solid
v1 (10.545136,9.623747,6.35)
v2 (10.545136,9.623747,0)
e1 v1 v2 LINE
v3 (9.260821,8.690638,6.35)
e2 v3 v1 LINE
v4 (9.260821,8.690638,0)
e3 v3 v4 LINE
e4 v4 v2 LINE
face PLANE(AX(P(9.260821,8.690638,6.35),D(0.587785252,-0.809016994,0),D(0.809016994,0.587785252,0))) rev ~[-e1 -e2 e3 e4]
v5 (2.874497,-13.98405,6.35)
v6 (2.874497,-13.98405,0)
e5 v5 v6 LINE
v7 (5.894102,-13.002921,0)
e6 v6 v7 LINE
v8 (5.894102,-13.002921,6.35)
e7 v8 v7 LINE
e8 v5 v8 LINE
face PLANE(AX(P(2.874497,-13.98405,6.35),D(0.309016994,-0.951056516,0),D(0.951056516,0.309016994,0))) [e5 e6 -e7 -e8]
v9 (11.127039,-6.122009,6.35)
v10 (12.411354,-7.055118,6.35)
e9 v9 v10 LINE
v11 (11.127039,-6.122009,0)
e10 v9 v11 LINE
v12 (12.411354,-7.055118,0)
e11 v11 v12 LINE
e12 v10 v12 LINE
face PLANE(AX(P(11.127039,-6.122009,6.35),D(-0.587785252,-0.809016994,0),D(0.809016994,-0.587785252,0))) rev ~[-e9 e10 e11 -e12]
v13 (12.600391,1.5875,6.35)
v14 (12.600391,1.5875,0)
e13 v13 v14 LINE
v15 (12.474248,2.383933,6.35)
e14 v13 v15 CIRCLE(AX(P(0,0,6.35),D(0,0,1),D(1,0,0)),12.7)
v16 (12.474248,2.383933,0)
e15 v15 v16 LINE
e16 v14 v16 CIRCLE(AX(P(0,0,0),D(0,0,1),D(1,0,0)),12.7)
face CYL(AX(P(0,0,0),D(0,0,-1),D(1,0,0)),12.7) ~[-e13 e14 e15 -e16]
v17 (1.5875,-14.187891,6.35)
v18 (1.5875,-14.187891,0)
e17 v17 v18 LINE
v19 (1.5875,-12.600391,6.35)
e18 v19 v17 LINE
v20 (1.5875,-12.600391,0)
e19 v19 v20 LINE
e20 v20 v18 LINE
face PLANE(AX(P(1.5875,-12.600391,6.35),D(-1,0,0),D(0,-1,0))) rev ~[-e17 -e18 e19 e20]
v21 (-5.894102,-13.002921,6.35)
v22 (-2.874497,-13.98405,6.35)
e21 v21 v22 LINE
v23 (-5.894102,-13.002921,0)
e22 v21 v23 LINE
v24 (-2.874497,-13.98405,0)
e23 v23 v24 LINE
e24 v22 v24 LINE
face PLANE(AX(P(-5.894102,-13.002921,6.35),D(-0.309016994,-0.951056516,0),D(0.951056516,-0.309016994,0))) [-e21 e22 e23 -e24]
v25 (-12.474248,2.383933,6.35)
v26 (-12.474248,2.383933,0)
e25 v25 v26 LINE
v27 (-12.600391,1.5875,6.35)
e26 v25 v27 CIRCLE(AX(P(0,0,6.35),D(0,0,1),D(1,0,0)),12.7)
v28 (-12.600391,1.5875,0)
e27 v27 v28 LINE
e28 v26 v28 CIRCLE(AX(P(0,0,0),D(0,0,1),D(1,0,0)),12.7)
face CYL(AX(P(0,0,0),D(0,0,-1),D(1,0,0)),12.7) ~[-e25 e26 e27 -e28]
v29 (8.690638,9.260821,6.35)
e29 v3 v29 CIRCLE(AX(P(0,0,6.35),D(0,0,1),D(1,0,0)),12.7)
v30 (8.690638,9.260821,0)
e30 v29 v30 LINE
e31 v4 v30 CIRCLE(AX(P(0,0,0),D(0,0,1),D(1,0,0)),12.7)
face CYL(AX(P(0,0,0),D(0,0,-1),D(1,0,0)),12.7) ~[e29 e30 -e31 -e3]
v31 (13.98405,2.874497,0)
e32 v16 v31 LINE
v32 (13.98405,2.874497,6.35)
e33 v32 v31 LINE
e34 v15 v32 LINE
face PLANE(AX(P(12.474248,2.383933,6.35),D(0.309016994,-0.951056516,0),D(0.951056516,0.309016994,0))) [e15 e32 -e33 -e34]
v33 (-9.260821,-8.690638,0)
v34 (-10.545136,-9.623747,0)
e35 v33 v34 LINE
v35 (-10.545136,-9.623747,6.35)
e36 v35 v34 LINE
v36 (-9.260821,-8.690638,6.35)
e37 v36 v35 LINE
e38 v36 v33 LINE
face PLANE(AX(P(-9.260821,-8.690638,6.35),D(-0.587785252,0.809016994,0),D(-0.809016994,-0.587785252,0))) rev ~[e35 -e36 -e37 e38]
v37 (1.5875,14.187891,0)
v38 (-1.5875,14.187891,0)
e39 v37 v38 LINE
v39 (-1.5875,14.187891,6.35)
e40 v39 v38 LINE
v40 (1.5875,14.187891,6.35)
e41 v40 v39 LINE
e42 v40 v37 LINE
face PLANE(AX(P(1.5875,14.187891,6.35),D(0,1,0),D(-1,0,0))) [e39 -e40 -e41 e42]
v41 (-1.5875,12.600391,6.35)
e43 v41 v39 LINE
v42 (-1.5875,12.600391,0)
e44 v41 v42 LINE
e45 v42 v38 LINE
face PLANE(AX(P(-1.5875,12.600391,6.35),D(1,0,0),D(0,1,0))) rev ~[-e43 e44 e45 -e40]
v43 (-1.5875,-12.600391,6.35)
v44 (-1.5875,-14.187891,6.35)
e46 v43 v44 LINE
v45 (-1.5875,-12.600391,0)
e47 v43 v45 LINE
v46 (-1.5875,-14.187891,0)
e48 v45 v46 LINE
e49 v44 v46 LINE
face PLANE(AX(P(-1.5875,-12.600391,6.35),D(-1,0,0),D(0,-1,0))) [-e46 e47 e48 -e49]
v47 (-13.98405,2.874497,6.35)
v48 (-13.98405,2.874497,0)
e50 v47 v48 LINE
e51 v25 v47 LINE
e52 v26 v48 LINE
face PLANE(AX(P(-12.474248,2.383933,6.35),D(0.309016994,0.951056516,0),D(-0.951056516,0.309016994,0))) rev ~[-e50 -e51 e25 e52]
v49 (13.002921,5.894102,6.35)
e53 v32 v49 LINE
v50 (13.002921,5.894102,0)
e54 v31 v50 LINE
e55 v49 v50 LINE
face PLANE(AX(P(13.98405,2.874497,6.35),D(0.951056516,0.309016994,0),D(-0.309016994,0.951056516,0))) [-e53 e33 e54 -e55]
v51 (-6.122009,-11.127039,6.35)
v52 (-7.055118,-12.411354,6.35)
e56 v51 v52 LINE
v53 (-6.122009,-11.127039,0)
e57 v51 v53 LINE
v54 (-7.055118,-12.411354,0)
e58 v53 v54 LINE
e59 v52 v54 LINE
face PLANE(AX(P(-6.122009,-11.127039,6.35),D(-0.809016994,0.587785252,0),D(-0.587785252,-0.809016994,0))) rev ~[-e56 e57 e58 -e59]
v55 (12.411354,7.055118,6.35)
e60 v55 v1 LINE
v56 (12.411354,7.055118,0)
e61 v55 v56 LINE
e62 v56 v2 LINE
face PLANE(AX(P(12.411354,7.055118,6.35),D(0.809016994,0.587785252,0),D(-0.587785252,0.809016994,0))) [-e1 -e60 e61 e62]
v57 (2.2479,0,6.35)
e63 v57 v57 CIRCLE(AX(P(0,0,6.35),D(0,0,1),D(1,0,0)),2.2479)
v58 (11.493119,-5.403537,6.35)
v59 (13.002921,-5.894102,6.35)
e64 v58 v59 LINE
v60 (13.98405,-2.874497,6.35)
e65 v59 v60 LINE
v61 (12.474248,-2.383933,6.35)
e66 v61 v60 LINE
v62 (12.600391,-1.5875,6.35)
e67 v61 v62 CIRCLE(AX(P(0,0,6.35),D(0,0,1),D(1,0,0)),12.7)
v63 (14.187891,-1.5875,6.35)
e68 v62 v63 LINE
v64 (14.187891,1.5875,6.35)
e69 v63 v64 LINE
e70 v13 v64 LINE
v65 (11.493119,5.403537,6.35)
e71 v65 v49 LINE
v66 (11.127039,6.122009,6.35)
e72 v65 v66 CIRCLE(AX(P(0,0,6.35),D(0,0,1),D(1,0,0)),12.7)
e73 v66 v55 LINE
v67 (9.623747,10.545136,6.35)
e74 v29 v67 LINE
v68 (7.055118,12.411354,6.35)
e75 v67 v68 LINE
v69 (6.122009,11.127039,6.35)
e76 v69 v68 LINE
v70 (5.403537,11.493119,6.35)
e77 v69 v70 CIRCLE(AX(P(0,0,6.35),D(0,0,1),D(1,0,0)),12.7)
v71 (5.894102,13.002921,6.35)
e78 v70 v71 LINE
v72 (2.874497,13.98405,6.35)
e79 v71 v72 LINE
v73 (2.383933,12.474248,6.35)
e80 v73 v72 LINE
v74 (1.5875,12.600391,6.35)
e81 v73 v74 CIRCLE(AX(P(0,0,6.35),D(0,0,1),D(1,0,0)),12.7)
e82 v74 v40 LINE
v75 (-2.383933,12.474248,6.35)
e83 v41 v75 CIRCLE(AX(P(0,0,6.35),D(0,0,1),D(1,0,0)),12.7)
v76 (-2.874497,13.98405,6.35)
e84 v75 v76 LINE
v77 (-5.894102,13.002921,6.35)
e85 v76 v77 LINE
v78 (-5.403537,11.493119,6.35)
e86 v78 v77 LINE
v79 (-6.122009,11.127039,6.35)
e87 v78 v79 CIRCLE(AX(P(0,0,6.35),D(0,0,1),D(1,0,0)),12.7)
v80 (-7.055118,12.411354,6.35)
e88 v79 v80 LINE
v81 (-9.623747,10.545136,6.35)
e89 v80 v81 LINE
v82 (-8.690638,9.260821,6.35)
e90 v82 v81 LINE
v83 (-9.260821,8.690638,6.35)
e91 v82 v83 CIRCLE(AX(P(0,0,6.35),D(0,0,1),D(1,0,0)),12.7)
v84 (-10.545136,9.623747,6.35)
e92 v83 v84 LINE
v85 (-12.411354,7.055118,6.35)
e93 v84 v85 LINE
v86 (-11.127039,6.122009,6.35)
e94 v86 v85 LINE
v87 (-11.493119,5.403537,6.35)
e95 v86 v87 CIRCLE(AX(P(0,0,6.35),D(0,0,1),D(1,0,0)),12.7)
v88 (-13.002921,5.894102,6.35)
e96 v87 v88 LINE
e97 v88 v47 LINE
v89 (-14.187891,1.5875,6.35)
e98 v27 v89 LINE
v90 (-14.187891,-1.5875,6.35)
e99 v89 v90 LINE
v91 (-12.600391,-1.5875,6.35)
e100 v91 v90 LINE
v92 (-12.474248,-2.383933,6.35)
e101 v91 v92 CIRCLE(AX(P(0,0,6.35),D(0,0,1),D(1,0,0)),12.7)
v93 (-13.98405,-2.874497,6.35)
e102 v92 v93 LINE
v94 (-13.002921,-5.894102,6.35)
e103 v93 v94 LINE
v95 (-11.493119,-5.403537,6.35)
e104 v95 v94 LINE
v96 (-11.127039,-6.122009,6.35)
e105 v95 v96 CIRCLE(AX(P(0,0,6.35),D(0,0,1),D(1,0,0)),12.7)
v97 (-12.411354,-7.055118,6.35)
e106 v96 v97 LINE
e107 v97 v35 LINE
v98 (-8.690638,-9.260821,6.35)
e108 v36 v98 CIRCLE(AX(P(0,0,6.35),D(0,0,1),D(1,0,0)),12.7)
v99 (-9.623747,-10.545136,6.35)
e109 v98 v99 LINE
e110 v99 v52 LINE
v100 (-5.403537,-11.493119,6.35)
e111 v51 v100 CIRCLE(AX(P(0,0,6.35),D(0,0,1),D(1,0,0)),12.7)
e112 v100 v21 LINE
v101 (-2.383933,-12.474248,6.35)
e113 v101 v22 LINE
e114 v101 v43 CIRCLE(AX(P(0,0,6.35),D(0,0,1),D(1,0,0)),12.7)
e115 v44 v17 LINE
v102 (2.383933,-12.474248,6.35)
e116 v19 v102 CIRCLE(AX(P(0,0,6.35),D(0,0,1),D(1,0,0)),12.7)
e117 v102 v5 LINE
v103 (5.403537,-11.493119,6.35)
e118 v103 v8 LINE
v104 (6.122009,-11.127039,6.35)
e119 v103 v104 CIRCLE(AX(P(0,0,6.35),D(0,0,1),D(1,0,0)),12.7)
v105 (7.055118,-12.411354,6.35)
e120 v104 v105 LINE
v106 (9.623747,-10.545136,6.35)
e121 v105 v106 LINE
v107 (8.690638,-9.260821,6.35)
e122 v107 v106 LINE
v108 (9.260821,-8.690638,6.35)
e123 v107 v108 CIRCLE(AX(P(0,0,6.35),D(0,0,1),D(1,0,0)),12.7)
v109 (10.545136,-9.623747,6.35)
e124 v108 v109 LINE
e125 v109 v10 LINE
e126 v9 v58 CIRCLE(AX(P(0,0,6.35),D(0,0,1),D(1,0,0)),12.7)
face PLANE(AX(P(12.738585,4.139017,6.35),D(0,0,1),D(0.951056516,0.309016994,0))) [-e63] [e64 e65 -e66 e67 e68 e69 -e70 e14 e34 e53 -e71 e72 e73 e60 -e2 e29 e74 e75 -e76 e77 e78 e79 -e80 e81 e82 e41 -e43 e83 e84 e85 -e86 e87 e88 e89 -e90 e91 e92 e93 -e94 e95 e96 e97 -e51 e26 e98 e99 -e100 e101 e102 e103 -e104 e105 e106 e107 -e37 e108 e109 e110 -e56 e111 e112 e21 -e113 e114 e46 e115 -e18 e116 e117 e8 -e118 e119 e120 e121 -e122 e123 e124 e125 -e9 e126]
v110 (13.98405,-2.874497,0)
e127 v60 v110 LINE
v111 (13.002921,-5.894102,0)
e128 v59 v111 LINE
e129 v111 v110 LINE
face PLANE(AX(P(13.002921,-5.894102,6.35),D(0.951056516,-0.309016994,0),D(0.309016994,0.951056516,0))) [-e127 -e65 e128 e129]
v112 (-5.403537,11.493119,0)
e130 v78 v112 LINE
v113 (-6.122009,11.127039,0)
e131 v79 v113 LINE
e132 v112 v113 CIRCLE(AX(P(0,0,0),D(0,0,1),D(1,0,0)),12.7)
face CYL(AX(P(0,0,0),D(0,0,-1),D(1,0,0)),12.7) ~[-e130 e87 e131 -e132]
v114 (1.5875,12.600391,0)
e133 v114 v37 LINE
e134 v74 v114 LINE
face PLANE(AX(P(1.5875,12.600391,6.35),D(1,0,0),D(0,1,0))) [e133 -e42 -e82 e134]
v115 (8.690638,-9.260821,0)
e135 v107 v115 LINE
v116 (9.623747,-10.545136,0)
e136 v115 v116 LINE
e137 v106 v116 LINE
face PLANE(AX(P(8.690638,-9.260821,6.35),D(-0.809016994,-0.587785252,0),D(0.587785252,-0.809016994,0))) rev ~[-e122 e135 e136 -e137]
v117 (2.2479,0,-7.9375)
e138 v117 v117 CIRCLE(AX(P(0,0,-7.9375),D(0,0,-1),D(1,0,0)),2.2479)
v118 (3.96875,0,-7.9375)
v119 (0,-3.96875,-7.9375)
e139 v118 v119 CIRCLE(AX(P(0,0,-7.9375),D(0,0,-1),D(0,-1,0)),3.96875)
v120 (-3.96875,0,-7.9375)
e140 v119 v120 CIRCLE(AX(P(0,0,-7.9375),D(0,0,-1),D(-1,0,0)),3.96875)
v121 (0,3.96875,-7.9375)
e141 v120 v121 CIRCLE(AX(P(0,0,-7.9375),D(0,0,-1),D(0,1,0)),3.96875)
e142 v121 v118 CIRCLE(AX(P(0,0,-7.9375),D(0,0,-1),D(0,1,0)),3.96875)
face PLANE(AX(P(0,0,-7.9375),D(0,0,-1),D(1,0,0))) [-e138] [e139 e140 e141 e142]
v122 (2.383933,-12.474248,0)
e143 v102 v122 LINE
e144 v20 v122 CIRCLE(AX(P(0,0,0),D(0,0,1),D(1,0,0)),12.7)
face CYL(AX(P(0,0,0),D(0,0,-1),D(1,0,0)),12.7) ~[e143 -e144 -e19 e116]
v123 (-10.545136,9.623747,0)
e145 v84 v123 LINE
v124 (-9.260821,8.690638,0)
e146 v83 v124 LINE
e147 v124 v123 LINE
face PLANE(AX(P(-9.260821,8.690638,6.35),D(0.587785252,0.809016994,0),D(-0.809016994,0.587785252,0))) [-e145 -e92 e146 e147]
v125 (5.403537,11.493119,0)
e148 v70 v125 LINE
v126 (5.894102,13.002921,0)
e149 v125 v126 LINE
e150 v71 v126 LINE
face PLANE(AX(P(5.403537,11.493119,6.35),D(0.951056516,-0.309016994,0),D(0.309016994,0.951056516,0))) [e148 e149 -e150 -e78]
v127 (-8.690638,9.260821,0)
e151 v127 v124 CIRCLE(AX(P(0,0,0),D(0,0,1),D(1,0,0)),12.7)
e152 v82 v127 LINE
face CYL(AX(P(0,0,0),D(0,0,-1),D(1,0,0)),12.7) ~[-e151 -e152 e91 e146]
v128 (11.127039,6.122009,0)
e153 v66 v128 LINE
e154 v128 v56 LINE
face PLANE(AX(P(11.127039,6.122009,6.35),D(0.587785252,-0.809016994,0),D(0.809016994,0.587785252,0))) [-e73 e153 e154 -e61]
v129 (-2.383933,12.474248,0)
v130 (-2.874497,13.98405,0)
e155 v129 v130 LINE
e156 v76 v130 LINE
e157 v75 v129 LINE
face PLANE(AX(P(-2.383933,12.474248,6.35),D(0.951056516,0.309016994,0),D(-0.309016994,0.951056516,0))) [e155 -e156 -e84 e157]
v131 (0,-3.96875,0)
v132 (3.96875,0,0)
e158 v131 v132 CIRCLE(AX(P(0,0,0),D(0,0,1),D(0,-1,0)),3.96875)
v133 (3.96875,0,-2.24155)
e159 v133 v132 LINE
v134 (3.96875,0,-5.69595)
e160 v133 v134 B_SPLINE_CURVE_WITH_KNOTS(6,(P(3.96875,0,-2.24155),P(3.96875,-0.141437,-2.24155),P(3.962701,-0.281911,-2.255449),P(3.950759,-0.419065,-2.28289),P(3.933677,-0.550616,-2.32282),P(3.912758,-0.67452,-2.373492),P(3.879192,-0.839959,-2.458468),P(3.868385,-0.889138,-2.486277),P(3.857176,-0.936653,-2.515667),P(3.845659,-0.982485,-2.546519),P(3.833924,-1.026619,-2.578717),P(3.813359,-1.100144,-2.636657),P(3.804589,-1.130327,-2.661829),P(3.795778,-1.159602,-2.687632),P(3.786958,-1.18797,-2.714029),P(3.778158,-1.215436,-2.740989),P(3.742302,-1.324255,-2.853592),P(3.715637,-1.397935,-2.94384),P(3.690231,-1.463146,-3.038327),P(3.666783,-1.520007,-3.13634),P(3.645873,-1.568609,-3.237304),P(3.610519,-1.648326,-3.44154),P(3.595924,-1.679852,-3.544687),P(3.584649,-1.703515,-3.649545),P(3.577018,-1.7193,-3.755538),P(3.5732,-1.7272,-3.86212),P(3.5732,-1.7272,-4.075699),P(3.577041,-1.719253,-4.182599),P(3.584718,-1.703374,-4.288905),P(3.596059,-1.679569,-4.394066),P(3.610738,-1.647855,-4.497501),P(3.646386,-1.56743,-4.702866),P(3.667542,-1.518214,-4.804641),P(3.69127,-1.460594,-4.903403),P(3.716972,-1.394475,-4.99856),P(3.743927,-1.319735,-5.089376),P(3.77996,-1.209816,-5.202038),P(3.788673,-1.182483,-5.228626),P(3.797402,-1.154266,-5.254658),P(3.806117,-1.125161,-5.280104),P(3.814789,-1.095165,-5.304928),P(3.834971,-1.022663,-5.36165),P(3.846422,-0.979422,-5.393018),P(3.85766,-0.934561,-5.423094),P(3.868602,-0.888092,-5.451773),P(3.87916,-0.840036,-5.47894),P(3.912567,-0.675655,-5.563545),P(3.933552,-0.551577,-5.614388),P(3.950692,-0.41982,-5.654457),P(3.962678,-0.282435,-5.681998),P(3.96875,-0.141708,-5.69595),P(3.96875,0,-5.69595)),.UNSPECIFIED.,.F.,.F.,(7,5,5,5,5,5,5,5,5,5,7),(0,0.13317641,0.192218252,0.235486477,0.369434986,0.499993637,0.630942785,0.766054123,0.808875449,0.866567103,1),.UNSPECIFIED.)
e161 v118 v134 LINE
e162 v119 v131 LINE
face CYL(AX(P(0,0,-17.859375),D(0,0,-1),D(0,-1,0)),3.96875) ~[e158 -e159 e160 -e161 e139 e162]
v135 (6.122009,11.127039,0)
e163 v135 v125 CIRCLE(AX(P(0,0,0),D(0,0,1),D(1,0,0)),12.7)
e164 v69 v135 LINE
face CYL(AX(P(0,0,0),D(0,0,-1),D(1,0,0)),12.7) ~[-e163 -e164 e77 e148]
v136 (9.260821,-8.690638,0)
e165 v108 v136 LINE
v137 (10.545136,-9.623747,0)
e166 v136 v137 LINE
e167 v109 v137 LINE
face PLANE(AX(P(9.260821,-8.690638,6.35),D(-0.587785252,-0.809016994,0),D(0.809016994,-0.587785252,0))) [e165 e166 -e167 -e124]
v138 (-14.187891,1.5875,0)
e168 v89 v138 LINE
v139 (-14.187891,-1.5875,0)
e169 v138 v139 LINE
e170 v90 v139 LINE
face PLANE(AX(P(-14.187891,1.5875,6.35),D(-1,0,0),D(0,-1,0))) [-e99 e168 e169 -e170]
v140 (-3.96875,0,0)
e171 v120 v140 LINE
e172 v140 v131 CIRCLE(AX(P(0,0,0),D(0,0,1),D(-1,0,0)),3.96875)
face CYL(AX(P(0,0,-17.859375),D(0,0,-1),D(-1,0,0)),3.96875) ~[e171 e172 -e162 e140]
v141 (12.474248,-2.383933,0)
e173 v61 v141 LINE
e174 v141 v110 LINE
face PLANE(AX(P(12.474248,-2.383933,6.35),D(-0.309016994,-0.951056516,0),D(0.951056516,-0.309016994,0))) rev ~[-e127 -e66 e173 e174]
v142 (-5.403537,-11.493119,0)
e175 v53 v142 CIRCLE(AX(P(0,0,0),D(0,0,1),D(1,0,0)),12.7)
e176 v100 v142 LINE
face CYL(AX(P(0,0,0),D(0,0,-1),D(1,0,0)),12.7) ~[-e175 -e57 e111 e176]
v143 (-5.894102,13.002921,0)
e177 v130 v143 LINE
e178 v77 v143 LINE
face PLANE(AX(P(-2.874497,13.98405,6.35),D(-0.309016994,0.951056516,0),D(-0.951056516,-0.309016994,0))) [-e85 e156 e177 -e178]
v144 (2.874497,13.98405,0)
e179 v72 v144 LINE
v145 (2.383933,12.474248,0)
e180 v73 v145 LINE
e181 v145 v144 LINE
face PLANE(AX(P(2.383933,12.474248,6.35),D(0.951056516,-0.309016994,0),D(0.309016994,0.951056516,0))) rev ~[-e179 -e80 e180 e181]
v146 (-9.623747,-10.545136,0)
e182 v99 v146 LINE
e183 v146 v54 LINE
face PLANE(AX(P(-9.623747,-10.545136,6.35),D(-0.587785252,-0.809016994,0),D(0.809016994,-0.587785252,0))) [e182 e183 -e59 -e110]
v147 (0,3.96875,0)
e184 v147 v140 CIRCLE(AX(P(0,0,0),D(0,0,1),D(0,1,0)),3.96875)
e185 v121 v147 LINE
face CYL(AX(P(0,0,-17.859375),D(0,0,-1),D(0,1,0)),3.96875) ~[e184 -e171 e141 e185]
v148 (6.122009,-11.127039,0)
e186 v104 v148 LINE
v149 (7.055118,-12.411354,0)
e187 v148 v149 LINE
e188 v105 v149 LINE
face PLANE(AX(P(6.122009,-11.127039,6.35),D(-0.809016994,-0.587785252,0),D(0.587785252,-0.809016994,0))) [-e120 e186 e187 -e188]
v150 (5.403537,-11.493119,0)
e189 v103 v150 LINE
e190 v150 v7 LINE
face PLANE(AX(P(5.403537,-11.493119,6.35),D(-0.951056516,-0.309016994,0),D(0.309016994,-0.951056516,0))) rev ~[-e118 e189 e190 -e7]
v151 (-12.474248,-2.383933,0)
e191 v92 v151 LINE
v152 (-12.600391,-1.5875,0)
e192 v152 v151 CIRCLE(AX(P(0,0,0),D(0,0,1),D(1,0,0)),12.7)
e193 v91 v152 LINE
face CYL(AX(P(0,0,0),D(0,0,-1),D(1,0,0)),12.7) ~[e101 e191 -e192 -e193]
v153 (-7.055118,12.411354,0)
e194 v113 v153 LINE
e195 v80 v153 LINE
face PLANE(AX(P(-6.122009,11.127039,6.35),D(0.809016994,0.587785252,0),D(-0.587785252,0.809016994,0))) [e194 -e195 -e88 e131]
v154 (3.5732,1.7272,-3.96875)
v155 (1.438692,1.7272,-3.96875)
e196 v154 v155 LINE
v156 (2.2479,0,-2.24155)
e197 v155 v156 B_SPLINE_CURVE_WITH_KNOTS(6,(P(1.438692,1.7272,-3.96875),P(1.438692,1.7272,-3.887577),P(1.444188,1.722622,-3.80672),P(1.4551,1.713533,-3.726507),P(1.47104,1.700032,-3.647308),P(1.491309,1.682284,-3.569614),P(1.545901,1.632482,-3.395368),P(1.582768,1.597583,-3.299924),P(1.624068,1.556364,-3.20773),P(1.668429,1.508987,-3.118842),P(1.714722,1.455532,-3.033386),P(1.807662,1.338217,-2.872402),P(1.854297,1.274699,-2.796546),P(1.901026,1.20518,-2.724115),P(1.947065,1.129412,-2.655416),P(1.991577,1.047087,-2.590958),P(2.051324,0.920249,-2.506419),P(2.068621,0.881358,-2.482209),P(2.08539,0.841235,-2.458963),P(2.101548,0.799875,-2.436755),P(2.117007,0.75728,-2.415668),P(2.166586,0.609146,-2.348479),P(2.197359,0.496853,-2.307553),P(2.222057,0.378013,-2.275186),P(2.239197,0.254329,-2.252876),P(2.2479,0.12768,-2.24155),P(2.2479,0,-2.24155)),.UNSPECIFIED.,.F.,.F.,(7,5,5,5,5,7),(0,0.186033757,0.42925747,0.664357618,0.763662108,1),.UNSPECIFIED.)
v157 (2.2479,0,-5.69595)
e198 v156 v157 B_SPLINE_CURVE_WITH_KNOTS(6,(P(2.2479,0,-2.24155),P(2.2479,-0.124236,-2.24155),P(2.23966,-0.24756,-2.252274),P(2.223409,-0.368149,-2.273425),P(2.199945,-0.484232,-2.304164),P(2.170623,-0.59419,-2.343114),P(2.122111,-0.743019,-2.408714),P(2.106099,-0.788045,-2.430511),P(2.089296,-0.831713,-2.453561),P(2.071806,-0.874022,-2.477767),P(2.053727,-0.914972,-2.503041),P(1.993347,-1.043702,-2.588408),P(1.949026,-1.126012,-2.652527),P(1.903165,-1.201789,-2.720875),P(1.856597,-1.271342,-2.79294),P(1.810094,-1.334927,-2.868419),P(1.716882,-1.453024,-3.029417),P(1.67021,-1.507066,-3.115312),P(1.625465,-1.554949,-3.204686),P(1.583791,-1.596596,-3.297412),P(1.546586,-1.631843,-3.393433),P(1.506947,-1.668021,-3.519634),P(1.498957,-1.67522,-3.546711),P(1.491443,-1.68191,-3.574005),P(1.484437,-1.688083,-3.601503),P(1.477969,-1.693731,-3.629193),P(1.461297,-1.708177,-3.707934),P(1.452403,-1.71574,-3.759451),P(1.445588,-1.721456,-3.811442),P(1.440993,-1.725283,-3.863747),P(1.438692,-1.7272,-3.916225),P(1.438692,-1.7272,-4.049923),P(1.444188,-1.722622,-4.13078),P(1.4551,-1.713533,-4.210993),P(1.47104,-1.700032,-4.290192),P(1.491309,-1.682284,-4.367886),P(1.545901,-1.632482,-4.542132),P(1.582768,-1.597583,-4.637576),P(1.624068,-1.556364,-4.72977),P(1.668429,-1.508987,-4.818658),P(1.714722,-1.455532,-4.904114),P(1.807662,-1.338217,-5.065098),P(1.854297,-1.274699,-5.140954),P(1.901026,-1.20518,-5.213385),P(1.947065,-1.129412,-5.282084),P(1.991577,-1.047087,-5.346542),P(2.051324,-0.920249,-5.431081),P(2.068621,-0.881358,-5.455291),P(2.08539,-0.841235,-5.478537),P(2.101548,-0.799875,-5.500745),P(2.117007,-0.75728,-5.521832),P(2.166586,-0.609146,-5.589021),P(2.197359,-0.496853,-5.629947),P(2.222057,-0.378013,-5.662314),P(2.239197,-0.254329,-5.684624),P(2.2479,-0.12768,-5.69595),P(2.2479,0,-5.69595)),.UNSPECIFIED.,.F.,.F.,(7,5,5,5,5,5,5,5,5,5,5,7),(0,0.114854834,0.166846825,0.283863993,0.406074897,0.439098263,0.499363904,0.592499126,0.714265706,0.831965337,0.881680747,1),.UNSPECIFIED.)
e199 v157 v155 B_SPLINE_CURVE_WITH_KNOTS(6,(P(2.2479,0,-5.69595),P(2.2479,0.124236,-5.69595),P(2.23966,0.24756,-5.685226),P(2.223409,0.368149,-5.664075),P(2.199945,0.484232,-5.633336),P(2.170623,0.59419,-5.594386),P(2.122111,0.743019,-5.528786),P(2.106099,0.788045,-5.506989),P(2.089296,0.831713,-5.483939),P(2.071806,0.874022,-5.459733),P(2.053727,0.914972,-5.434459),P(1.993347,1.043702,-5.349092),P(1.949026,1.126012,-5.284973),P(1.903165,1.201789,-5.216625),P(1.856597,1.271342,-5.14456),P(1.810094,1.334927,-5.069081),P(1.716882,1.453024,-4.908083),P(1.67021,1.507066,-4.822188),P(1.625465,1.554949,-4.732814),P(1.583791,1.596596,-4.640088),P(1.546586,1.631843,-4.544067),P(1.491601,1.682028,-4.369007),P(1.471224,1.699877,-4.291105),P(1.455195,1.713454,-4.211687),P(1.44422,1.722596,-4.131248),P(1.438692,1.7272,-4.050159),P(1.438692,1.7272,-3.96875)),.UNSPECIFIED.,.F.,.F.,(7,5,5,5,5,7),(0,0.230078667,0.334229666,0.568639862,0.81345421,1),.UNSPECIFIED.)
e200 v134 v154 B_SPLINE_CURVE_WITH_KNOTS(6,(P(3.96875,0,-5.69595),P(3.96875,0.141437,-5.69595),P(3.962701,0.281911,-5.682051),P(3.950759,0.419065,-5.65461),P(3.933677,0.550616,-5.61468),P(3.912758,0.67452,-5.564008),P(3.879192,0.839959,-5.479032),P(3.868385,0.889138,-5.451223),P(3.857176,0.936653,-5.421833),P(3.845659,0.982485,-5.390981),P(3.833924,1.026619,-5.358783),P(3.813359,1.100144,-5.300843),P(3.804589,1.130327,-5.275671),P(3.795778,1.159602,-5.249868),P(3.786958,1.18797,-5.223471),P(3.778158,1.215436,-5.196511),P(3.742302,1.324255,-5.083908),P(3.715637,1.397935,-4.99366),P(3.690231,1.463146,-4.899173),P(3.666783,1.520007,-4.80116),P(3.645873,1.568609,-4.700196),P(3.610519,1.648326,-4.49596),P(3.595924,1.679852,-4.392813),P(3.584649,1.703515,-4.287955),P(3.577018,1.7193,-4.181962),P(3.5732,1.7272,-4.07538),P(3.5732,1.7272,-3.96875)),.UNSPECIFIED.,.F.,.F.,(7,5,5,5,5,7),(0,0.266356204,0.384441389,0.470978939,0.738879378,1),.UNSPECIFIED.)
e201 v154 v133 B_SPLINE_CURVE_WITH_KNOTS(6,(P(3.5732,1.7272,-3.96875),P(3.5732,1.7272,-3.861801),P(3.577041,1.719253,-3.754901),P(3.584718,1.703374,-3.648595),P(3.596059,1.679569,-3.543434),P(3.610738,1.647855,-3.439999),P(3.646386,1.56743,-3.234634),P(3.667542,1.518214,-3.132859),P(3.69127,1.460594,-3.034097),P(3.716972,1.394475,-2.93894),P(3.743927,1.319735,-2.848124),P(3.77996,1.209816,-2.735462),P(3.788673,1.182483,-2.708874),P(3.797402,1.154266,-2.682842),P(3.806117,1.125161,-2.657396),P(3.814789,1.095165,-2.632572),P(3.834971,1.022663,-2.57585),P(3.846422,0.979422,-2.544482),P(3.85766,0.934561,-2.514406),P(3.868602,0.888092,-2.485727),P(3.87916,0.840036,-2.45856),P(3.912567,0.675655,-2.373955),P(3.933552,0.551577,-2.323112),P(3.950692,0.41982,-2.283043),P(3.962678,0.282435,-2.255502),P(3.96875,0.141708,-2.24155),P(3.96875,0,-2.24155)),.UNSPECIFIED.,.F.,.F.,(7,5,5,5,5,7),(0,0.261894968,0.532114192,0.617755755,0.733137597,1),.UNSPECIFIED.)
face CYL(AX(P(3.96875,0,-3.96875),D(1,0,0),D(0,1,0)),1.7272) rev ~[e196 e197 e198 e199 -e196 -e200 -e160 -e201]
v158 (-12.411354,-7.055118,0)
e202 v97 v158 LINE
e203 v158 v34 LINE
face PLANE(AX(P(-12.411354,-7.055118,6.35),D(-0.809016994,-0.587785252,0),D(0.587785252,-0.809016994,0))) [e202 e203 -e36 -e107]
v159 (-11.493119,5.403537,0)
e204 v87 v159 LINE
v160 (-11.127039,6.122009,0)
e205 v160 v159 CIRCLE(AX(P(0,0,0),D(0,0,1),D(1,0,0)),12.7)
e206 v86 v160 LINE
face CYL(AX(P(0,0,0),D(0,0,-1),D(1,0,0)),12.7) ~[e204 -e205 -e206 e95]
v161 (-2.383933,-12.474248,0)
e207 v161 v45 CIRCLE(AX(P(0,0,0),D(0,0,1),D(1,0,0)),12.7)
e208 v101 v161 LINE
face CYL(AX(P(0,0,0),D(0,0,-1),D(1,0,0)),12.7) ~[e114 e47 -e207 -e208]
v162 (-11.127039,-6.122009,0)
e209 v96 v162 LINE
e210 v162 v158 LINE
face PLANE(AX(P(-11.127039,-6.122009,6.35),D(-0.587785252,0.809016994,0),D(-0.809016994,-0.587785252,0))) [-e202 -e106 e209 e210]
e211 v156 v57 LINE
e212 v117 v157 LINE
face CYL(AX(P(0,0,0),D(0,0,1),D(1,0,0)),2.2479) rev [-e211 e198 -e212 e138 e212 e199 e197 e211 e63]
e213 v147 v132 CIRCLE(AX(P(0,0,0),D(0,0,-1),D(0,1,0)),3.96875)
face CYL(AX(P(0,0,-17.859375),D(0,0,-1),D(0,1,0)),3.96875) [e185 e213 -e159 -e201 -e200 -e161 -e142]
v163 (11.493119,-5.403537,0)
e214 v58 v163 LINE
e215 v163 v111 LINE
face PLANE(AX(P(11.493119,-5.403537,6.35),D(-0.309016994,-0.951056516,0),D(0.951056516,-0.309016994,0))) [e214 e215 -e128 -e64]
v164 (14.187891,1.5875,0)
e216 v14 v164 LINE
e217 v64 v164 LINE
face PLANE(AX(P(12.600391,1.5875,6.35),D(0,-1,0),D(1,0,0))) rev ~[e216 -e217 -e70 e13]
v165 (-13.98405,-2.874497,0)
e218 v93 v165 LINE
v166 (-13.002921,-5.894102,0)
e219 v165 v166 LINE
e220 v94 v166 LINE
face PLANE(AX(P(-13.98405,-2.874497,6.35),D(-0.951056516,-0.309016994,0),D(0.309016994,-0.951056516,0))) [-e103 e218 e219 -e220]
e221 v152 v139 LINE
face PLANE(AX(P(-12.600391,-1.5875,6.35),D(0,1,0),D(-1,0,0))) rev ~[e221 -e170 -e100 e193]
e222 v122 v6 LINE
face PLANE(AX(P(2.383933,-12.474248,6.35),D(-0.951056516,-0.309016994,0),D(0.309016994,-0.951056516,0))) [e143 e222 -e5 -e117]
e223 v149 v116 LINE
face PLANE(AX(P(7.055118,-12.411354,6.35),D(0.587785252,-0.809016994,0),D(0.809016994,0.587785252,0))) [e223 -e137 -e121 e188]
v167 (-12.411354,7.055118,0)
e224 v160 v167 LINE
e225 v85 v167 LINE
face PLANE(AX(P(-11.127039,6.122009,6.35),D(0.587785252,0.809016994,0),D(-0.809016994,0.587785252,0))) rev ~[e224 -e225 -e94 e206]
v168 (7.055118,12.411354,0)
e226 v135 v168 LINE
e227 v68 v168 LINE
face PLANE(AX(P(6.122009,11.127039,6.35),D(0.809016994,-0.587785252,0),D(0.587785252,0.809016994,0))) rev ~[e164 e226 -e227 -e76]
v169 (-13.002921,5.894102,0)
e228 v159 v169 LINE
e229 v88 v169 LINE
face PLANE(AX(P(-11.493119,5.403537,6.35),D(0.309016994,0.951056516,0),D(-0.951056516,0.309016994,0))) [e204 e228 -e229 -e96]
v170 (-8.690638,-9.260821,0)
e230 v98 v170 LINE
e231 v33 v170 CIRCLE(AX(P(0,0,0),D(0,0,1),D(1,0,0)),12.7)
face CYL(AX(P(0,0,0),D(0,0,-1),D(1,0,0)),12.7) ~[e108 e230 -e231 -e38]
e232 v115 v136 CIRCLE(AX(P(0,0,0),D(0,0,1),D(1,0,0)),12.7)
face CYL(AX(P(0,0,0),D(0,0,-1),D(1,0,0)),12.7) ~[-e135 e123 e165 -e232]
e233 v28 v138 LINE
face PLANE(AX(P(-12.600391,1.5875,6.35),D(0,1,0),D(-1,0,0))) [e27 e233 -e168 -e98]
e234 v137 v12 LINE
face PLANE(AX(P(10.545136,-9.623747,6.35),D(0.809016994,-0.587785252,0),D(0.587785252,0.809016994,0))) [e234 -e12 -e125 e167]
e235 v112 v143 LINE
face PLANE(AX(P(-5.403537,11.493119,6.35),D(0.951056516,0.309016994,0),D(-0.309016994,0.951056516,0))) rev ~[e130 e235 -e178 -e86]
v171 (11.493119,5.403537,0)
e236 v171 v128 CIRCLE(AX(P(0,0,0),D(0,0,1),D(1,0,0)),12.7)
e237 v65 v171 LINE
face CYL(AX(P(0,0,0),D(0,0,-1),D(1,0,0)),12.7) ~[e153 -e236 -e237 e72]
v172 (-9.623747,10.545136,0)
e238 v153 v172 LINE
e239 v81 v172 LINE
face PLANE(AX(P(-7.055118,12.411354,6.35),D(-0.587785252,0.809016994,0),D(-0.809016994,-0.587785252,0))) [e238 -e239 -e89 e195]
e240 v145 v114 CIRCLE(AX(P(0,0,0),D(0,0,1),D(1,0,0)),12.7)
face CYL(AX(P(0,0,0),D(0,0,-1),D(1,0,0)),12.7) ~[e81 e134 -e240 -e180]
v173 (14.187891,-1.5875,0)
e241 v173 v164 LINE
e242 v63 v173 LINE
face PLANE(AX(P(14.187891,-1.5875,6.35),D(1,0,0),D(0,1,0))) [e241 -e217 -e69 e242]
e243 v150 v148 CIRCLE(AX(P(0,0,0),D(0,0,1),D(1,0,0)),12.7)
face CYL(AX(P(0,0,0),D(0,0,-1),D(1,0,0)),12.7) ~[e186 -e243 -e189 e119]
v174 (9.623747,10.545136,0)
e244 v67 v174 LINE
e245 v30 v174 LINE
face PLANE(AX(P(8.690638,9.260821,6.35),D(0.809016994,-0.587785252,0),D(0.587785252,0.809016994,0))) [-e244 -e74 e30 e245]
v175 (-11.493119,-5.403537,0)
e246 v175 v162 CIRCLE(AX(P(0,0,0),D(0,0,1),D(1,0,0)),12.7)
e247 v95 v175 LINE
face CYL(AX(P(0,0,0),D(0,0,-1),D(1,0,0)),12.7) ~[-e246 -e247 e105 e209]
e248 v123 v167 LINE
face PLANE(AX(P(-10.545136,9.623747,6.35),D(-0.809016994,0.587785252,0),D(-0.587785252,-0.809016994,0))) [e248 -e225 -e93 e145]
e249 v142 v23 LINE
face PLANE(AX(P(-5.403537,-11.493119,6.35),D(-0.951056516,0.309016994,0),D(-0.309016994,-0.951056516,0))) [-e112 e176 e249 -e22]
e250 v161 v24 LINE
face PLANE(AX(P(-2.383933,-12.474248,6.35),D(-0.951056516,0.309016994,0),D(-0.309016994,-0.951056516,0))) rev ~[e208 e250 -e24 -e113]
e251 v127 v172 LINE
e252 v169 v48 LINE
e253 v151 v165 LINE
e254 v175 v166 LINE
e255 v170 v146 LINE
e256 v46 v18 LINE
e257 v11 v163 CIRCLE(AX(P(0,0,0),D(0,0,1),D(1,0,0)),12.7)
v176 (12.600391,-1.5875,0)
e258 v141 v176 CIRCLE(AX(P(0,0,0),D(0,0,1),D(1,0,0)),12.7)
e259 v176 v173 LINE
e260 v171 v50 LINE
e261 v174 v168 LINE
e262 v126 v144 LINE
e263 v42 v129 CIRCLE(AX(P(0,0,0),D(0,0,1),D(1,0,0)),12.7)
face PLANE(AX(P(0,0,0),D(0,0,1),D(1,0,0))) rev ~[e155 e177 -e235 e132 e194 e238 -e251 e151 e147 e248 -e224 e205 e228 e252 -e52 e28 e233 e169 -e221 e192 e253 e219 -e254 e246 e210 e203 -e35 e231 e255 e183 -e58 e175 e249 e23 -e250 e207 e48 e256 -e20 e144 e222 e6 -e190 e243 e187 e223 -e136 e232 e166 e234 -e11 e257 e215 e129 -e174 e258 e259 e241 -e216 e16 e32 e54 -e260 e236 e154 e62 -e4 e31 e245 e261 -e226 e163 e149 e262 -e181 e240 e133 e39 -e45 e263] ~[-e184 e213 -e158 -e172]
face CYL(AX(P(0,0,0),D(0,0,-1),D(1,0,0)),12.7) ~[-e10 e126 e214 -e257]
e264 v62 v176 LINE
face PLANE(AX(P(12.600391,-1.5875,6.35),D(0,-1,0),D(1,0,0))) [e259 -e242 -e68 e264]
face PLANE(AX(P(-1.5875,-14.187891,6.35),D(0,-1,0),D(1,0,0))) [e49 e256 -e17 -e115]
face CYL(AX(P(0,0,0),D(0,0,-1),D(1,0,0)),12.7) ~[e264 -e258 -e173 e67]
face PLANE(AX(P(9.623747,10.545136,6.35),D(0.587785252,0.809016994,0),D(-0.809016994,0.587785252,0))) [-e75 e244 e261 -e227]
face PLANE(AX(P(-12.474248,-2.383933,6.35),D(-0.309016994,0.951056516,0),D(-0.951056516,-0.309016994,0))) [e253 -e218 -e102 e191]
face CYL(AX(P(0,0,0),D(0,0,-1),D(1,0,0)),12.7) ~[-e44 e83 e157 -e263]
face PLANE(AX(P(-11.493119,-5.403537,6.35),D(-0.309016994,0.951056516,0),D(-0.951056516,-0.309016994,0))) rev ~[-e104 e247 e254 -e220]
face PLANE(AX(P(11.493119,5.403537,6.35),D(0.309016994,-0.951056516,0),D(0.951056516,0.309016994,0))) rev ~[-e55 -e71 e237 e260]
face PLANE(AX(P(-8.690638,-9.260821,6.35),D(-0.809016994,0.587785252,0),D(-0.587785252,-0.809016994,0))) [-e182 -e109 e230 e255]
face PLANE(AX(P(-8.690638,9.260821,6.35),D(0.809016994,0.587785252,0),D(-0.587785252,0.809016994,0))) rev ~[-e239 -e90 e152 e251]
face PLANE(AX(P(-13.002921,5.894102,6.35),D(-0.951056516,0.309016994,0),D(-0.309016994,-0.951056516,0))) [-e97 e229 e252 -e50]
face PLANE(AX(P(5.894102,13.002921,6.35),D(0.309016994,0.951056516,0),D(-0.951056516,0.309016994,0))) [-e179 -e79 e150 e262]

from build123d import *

# Parameters (mm, degrees)
F0_R        = 12.7
F0_R_2      = 2.2479
F1_DEPTH    = 6.35
F2_W        = 7.9375
F2_H        = 7.9375
F2_R        = 2.2479
F3_DEPTH    = 7.9375
F5_REACH    = 20.5318866107
F6_T1_DEPTH = 17.859375
F7_W        = 1.5875
F7_H        = 3.175
F8_DEPTH    = 6.35
F9_COUNT    = 20
F9_ANGLE    = 342


# Not quite as in the source:
# - a fillet or chamfer that OpenCascade refuses, or shapes differently, is made with other operations: its cross-section is extruded or revolved along the edge and cut away or added


with BuildPart() as f1:
    # F0 (on Top) → F1 (new body)
    with BuildSketch(Plane.XY):
        Circle(F0_R)
        Circle(F0_R_2, mode=Mode.SUBTRACT)
    extrude(amount=F1_DEPTH)

    # F2 (on face) → F3 (join)
    with BuildSketch(Plane(origin=(0, 0, 0), x_dir=(1, 0, 0), z_dir=(0, 0, -1))):
        Rectangle(F2_W, F2_H)
        Circle(F2_R, mode=Mode.SUBTRACT)
    extrude(amount=F3_DEPTH)

    f5_end = f1.faces().sort_by_distance((-2.2479, 0, -0.79375))[0]
    # F4 (on face) → F5 (cut, up to a face of the model that its end follows)
    with BuildSketch(Plane.YZ.offset(3.96875)):
        with BuildLine():
            ThreePointArc((-1.7272, -3.96875), (0, -5.69595), (1.7272, -3.96875))
            Line((1.7272, -3.96875), (-1.7272, -3.96875))
        make_face()
        with BuildLine():
            Line((-1.7272, -3.96875), (1.7272, -3.96875))
            ThreePointArc((1.7272, -3.96875), (0, -2.24155), (-1.7272, -3.96875))
        make_face()
    f5_long = extrude(amount=-F5_REACH, mode=Mode.PRIVATE)
    add(split(f5_long, bisect_by=f5_end, keep=Keep.ALL, mode=Mode.PRIVATE).solids().sort_by_distance((3.96875, 0, -3.96875))[0], mode=Mode.SUBTRACT)

    # F6: fillet of radius 3.96875 on 4 edges, made by hand

    # F6_s2 → F6_t1 (cut)
    with BuildSketch(Plane.XY.offset(-17.859375)):
        with BuildLine():
            ThreePointArc((0, 3.96875), (2.8063300378, 2.8063300378), (3.96875, 0))
            Line((3.96875, 0), (3.96875, 3.96875))
            Line((3.96875, 3.96875), (0, 3.96875))
        make_face()
        with BuildLine():
            ThreePointArc((0, 3.96875), (-2.8063300378, 2.8063300378), (-3.96875, 0))
            Line((-3.96875, 0), (-3.96875, 3.96875))
            Line((-3.96875, 3.96875), (0, 3.96875))
        make_face()
        with BuildLine():
            ThreePointArc((-3.96875, 0), (-2.8063300378, -2.8063300378), (0, -3.96875))
            Line((0, -3.96875), (-3.96875, -3.96875))
            Line((-3.96875, -3.96875), (-3.96875, 0))
        make_face()
        with BuildLine():
            ThreePointArc((0, -3.96875), (2.8063300378, -2.8063300378), (3.96875, 0))
            Line((3.96875, 0), (3.96875, -3.96875))
            Line((3.96875, -3.96875), (0, -3.96875))
        make_face()
    extrude(amount=F6_T1_DEPTH, mode=Mode.SUBTRACT)

    # F7 (on face) → F8 (join, through all)
    with BuildSketch(Plane.XY.offset(6.35)):
        with Locations((13.3941406189, 0)):
            Rectangle(F7_W, F7_H)
    f8 = extrude(amount=-F8_DEPTH)

    # F9: F8 ×20 about axis
    f9_axis = Axis((0, 0, 0), (0, 0, -1))
    for i in range(1, F9_COUNT):
        add(f8.rotate(f9_axis, i * F9_ANGLE / (F9_COUNT - 1)))


solid = f1.part
